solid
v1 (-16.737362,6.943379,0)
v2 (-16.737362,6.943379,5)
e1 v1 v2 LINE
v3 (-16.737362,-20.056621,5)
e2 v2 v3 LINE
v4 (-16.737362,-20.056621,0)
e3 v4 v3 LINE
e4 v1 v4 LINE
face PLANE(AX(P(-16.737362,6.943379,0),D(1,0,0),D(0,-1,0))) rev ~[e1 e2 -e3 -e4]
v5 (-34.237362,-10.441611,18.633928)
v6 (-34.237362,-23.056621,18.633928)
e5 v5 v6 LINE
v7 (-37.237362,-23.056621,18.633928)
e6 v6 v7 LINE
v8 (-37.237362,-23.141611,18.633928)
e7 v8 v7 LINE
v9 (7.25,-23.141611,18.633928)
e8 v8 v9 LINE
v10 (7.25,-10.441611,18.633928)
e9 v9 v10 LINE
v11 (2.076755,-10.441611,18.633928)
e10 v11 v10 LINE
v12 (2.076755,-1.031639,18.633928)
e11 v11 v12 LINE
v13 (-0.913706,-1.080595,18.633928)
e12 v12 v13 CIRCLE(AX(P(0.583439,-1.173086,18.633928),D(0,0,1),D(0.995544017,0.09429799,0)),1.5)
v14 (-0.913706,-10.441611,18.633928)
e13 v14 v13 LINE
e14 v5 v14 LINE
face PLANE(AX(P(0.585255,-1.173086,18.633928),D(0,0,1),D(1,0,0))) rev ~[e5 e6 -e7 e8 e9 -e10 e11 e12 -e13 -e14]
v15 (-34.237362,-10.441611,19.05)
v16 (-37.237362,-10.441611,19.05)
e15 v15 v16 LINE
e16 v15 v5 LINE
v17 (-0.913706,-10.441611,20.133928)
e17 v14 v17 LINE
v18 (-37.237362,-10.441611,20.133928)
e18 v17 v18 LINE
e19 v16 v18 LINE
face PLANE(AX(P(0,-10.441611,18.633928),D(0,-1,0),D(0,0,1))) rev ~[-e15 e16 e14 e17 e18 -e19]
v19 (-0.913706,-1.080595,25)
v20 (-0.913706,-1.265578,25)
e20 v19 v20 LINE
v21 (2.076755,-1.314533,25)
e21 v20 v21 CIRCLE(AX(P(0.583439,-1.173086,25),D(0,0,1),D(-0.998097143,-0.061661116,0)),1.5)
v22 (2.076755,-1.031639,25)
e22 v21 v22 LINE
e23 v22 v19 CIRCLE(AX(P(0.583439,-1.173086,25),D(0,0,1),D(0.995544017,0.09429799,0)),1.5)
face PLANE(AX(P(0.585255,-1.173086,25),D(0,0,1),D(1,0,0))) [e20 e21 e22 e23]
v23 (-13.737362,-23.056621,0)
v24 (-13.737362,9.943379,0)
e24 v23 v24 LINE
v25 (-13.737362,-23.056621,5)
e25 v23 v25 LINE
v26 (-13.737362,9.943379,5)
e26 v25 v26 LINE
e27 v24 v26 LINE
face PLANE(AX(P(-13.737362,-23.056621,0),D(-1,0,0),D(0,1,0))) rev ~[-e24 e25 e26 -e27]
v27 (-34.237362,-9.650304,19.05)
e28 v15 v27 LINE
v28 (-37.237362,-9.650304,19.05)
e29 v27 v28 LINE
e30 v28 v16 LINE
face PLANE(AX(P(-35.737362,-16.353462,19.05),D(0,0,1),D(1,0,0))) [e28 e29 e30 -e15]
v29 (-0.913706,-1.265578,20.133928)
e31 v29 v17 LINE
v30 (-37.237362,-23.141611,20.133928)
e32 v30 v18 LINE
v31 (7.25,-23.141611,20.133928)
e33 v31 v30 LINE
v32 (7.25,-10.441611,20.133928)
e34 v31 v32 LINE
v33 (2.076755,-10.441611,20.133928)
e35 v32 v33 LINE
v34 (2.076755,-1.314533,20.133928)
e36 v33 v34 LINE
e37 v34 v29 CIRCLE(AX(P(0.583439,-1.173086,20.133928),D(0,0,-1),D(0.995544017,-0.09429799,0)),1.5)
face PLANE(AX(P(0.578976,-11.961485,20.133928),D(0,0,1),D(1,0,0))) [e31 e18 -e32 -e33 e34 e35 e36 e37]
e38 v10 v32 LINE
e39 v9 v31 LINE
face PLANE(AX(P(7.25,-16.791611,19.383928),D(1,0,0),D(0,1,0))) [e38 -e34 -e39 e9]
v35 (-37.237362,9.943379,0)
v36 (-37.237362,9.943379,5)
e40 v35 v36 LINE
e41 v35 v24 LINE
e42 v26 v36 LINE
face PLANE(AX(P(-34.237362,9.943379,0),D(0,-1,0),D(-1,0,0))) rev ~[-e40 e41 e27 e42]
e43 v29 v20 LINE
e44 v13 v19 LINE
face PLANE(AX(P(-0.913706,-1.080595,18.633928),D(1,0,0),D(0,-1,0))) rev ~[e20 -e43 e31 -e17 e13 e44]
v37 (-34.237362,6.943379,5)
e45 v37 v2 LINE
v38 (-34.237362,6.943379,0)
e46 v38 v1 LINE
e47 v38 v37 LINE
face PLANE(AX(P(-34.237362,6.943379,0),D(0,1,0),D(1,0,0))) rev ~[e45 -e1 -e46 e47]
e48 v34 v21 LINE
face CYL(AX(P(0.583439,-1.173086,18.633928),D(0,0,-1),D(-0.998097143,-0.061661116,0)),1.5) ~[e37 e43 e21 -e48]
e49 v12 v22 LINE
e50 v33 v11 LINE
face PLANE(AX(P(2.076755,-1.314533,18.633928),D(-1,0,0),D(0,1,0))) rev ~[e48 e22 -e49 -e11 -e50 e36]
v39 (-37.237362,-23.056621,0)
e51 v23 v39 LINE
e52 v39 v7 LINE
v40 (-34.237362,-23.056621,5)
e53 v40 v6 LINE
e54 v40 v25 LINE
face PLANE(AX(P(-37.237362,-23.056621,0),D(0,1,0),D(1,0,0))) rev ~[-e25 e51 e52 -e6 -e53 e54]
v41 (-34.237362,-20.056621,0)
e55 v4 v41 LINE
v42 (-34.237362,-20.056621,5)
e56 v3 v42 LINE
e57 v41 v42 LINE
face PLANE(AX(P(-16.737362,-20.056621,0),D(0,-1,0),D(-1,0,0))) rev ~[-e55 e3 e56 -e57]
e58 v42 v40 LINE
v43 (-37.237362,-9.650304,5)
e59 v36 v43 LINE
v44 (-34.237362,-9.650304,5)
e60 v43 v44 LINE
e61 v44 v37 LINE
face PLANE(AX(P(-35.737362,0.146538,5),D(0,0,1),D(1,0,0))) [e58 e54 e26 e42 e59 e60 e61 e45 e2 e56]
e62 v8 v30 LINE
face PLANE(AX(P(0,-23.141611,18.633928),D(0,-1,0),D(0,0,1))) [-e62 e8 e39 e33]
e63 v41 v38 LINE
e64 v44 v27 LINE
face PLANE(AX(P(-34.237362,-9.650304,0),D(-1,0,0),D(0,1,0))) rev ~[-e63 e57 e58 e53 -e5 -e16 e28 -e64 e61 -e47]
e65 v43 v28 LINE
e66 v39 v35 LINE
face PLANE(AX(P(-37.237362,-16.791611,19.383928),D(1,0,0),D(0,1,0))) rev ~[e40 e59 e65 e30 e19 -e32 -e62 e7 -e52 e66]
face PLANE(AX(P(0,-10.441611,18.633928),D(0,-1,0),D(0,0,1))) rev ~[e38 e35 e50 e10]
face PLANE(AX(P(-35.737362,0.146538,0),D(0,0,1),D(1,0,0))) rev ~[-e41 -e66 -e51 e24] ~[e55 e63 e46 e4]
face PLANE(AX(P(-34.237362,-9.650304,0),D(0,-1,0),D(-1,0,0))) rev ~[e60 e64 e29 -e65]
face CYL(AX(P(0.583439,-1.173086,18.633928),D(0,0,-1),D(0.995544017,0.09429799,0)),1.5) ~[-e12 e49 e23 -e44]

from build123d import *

# Parameters (mm, degrees)
F1_DEPTH      = 5
F2_DEPTH      = 19.05
F3_DEPTH      = 5
F4_W          = 12.7
F4_H          = 1.5
F5_DEPTH      = 37.23736246
F5_DEPTH_BACK = 7.25
F6_START      = 18.6339281499
F6_DEPTH      = 1.5
F7_START      = 18.6339281499
F7_DEPTH      = 6.3660718501


with BuildPart() as f1:
    # F0 (on Top) → F1 (new body)
    with BuildSketch(Plane.XY):
        Polygon((-34.23736246, 9.9433793599), (-34.23736246, 6.9433793599), (-16.73736246, 6.9433793599), (-16.73736246, -20.0566206401), (-34.23736246, -20.0566206401), (-34.23736246, -23.0566206401), (-13.73736246, -23.0566206401), (-13.73736246, 9.9433793599), align=None)
    extrude(amount=F1_DEPTH)

    # F0 (on Top) → F2 (join)
    with BuildSketch(Plane.XY):
        Polygon((-34.23736246, -20.0566206401), (-34.23736246, -9.6503041635), (-37.23736246, -9.6503041635), (-37.23736246, -23.0566206401), (-34.23736246, -23.0566206401), align=None)
    extrude(amount=F2_DEPTH)

    # F0 (on Top) → F3 (join)
    with BuildSketch(Plane.XY):
        Polygon((-34.23736246, -9.6503041635), (-34.23736246, 6.9433793599), (-34.23736246, 9.9433793599), (-37.23736246, 9.9433793599), (-37.23736246, -9.6503041635), align=None)
    extrude(amount=F3_DEPTH)

    # F4 (on Right) → F5 (join, two sides)
    with BuildSketch(Plane.YZ) as f5_sk:
        with Locations((-16.7916113675, 19.3839281499)):
            Rectangle(F4_W, F4_H)
    extrude(amount=-F5_DEPTH)
    extrude(f5_sk.sketch, amount=F5_DEPTH_BACK)

    # F0 (on Top) → F6 (join)
    with BuildSketch(Plane.XY.offset(F6_START)):
        with BuildLine():
            Line((2.0767554697, -8.3933884358), (2.0767554697, -1.3145332665))
            ThreePointArc((2.0767554697, -1.3145332665), (0.5588870059, -2.6728853277), (-0.9137062697, -1.2655779555))
            Line((-0.9137062697, -1.2655779555), (-0.9137062697, -8.3933884358))
            Line((-0.9137062697, -8.3933884358), (-0.9137062697, -23.0566206401))
            Line((-0.9137062697, -23.0566206401), (2.0767554697, -23.0566206401))
            Line((2.0767554697, -23.0566206401), (2.0767554697, -8.3933884358))
        make_face()
    extrude(amount=F6_DEPTH)

    # F0 (on Top) → F7 (join)
    with BuildSketch(Plane.XY.offset(F7_START)):
        with BuildLine():
            Line((2.0767554697, -1.3145332665), (2.0767554697, -1.0316392973))
            ThreePointArc((2.0767554697, -1.0316392973), (0.5588870059, 0.3267127639), (-0.9137062697, -1.0805946084))
            Line((-0.9137062697, -1.0805946084), (-0.9137062697, -1.2655779555))
            ThreePointArc((-0.9137062697, -1.2655779555), (0.5588870059, -2.6728853277), (2.0767554697, -1.3145332665))
        make_face()
    extrude(amount=F7_DEPTH)


solid = f1.part
